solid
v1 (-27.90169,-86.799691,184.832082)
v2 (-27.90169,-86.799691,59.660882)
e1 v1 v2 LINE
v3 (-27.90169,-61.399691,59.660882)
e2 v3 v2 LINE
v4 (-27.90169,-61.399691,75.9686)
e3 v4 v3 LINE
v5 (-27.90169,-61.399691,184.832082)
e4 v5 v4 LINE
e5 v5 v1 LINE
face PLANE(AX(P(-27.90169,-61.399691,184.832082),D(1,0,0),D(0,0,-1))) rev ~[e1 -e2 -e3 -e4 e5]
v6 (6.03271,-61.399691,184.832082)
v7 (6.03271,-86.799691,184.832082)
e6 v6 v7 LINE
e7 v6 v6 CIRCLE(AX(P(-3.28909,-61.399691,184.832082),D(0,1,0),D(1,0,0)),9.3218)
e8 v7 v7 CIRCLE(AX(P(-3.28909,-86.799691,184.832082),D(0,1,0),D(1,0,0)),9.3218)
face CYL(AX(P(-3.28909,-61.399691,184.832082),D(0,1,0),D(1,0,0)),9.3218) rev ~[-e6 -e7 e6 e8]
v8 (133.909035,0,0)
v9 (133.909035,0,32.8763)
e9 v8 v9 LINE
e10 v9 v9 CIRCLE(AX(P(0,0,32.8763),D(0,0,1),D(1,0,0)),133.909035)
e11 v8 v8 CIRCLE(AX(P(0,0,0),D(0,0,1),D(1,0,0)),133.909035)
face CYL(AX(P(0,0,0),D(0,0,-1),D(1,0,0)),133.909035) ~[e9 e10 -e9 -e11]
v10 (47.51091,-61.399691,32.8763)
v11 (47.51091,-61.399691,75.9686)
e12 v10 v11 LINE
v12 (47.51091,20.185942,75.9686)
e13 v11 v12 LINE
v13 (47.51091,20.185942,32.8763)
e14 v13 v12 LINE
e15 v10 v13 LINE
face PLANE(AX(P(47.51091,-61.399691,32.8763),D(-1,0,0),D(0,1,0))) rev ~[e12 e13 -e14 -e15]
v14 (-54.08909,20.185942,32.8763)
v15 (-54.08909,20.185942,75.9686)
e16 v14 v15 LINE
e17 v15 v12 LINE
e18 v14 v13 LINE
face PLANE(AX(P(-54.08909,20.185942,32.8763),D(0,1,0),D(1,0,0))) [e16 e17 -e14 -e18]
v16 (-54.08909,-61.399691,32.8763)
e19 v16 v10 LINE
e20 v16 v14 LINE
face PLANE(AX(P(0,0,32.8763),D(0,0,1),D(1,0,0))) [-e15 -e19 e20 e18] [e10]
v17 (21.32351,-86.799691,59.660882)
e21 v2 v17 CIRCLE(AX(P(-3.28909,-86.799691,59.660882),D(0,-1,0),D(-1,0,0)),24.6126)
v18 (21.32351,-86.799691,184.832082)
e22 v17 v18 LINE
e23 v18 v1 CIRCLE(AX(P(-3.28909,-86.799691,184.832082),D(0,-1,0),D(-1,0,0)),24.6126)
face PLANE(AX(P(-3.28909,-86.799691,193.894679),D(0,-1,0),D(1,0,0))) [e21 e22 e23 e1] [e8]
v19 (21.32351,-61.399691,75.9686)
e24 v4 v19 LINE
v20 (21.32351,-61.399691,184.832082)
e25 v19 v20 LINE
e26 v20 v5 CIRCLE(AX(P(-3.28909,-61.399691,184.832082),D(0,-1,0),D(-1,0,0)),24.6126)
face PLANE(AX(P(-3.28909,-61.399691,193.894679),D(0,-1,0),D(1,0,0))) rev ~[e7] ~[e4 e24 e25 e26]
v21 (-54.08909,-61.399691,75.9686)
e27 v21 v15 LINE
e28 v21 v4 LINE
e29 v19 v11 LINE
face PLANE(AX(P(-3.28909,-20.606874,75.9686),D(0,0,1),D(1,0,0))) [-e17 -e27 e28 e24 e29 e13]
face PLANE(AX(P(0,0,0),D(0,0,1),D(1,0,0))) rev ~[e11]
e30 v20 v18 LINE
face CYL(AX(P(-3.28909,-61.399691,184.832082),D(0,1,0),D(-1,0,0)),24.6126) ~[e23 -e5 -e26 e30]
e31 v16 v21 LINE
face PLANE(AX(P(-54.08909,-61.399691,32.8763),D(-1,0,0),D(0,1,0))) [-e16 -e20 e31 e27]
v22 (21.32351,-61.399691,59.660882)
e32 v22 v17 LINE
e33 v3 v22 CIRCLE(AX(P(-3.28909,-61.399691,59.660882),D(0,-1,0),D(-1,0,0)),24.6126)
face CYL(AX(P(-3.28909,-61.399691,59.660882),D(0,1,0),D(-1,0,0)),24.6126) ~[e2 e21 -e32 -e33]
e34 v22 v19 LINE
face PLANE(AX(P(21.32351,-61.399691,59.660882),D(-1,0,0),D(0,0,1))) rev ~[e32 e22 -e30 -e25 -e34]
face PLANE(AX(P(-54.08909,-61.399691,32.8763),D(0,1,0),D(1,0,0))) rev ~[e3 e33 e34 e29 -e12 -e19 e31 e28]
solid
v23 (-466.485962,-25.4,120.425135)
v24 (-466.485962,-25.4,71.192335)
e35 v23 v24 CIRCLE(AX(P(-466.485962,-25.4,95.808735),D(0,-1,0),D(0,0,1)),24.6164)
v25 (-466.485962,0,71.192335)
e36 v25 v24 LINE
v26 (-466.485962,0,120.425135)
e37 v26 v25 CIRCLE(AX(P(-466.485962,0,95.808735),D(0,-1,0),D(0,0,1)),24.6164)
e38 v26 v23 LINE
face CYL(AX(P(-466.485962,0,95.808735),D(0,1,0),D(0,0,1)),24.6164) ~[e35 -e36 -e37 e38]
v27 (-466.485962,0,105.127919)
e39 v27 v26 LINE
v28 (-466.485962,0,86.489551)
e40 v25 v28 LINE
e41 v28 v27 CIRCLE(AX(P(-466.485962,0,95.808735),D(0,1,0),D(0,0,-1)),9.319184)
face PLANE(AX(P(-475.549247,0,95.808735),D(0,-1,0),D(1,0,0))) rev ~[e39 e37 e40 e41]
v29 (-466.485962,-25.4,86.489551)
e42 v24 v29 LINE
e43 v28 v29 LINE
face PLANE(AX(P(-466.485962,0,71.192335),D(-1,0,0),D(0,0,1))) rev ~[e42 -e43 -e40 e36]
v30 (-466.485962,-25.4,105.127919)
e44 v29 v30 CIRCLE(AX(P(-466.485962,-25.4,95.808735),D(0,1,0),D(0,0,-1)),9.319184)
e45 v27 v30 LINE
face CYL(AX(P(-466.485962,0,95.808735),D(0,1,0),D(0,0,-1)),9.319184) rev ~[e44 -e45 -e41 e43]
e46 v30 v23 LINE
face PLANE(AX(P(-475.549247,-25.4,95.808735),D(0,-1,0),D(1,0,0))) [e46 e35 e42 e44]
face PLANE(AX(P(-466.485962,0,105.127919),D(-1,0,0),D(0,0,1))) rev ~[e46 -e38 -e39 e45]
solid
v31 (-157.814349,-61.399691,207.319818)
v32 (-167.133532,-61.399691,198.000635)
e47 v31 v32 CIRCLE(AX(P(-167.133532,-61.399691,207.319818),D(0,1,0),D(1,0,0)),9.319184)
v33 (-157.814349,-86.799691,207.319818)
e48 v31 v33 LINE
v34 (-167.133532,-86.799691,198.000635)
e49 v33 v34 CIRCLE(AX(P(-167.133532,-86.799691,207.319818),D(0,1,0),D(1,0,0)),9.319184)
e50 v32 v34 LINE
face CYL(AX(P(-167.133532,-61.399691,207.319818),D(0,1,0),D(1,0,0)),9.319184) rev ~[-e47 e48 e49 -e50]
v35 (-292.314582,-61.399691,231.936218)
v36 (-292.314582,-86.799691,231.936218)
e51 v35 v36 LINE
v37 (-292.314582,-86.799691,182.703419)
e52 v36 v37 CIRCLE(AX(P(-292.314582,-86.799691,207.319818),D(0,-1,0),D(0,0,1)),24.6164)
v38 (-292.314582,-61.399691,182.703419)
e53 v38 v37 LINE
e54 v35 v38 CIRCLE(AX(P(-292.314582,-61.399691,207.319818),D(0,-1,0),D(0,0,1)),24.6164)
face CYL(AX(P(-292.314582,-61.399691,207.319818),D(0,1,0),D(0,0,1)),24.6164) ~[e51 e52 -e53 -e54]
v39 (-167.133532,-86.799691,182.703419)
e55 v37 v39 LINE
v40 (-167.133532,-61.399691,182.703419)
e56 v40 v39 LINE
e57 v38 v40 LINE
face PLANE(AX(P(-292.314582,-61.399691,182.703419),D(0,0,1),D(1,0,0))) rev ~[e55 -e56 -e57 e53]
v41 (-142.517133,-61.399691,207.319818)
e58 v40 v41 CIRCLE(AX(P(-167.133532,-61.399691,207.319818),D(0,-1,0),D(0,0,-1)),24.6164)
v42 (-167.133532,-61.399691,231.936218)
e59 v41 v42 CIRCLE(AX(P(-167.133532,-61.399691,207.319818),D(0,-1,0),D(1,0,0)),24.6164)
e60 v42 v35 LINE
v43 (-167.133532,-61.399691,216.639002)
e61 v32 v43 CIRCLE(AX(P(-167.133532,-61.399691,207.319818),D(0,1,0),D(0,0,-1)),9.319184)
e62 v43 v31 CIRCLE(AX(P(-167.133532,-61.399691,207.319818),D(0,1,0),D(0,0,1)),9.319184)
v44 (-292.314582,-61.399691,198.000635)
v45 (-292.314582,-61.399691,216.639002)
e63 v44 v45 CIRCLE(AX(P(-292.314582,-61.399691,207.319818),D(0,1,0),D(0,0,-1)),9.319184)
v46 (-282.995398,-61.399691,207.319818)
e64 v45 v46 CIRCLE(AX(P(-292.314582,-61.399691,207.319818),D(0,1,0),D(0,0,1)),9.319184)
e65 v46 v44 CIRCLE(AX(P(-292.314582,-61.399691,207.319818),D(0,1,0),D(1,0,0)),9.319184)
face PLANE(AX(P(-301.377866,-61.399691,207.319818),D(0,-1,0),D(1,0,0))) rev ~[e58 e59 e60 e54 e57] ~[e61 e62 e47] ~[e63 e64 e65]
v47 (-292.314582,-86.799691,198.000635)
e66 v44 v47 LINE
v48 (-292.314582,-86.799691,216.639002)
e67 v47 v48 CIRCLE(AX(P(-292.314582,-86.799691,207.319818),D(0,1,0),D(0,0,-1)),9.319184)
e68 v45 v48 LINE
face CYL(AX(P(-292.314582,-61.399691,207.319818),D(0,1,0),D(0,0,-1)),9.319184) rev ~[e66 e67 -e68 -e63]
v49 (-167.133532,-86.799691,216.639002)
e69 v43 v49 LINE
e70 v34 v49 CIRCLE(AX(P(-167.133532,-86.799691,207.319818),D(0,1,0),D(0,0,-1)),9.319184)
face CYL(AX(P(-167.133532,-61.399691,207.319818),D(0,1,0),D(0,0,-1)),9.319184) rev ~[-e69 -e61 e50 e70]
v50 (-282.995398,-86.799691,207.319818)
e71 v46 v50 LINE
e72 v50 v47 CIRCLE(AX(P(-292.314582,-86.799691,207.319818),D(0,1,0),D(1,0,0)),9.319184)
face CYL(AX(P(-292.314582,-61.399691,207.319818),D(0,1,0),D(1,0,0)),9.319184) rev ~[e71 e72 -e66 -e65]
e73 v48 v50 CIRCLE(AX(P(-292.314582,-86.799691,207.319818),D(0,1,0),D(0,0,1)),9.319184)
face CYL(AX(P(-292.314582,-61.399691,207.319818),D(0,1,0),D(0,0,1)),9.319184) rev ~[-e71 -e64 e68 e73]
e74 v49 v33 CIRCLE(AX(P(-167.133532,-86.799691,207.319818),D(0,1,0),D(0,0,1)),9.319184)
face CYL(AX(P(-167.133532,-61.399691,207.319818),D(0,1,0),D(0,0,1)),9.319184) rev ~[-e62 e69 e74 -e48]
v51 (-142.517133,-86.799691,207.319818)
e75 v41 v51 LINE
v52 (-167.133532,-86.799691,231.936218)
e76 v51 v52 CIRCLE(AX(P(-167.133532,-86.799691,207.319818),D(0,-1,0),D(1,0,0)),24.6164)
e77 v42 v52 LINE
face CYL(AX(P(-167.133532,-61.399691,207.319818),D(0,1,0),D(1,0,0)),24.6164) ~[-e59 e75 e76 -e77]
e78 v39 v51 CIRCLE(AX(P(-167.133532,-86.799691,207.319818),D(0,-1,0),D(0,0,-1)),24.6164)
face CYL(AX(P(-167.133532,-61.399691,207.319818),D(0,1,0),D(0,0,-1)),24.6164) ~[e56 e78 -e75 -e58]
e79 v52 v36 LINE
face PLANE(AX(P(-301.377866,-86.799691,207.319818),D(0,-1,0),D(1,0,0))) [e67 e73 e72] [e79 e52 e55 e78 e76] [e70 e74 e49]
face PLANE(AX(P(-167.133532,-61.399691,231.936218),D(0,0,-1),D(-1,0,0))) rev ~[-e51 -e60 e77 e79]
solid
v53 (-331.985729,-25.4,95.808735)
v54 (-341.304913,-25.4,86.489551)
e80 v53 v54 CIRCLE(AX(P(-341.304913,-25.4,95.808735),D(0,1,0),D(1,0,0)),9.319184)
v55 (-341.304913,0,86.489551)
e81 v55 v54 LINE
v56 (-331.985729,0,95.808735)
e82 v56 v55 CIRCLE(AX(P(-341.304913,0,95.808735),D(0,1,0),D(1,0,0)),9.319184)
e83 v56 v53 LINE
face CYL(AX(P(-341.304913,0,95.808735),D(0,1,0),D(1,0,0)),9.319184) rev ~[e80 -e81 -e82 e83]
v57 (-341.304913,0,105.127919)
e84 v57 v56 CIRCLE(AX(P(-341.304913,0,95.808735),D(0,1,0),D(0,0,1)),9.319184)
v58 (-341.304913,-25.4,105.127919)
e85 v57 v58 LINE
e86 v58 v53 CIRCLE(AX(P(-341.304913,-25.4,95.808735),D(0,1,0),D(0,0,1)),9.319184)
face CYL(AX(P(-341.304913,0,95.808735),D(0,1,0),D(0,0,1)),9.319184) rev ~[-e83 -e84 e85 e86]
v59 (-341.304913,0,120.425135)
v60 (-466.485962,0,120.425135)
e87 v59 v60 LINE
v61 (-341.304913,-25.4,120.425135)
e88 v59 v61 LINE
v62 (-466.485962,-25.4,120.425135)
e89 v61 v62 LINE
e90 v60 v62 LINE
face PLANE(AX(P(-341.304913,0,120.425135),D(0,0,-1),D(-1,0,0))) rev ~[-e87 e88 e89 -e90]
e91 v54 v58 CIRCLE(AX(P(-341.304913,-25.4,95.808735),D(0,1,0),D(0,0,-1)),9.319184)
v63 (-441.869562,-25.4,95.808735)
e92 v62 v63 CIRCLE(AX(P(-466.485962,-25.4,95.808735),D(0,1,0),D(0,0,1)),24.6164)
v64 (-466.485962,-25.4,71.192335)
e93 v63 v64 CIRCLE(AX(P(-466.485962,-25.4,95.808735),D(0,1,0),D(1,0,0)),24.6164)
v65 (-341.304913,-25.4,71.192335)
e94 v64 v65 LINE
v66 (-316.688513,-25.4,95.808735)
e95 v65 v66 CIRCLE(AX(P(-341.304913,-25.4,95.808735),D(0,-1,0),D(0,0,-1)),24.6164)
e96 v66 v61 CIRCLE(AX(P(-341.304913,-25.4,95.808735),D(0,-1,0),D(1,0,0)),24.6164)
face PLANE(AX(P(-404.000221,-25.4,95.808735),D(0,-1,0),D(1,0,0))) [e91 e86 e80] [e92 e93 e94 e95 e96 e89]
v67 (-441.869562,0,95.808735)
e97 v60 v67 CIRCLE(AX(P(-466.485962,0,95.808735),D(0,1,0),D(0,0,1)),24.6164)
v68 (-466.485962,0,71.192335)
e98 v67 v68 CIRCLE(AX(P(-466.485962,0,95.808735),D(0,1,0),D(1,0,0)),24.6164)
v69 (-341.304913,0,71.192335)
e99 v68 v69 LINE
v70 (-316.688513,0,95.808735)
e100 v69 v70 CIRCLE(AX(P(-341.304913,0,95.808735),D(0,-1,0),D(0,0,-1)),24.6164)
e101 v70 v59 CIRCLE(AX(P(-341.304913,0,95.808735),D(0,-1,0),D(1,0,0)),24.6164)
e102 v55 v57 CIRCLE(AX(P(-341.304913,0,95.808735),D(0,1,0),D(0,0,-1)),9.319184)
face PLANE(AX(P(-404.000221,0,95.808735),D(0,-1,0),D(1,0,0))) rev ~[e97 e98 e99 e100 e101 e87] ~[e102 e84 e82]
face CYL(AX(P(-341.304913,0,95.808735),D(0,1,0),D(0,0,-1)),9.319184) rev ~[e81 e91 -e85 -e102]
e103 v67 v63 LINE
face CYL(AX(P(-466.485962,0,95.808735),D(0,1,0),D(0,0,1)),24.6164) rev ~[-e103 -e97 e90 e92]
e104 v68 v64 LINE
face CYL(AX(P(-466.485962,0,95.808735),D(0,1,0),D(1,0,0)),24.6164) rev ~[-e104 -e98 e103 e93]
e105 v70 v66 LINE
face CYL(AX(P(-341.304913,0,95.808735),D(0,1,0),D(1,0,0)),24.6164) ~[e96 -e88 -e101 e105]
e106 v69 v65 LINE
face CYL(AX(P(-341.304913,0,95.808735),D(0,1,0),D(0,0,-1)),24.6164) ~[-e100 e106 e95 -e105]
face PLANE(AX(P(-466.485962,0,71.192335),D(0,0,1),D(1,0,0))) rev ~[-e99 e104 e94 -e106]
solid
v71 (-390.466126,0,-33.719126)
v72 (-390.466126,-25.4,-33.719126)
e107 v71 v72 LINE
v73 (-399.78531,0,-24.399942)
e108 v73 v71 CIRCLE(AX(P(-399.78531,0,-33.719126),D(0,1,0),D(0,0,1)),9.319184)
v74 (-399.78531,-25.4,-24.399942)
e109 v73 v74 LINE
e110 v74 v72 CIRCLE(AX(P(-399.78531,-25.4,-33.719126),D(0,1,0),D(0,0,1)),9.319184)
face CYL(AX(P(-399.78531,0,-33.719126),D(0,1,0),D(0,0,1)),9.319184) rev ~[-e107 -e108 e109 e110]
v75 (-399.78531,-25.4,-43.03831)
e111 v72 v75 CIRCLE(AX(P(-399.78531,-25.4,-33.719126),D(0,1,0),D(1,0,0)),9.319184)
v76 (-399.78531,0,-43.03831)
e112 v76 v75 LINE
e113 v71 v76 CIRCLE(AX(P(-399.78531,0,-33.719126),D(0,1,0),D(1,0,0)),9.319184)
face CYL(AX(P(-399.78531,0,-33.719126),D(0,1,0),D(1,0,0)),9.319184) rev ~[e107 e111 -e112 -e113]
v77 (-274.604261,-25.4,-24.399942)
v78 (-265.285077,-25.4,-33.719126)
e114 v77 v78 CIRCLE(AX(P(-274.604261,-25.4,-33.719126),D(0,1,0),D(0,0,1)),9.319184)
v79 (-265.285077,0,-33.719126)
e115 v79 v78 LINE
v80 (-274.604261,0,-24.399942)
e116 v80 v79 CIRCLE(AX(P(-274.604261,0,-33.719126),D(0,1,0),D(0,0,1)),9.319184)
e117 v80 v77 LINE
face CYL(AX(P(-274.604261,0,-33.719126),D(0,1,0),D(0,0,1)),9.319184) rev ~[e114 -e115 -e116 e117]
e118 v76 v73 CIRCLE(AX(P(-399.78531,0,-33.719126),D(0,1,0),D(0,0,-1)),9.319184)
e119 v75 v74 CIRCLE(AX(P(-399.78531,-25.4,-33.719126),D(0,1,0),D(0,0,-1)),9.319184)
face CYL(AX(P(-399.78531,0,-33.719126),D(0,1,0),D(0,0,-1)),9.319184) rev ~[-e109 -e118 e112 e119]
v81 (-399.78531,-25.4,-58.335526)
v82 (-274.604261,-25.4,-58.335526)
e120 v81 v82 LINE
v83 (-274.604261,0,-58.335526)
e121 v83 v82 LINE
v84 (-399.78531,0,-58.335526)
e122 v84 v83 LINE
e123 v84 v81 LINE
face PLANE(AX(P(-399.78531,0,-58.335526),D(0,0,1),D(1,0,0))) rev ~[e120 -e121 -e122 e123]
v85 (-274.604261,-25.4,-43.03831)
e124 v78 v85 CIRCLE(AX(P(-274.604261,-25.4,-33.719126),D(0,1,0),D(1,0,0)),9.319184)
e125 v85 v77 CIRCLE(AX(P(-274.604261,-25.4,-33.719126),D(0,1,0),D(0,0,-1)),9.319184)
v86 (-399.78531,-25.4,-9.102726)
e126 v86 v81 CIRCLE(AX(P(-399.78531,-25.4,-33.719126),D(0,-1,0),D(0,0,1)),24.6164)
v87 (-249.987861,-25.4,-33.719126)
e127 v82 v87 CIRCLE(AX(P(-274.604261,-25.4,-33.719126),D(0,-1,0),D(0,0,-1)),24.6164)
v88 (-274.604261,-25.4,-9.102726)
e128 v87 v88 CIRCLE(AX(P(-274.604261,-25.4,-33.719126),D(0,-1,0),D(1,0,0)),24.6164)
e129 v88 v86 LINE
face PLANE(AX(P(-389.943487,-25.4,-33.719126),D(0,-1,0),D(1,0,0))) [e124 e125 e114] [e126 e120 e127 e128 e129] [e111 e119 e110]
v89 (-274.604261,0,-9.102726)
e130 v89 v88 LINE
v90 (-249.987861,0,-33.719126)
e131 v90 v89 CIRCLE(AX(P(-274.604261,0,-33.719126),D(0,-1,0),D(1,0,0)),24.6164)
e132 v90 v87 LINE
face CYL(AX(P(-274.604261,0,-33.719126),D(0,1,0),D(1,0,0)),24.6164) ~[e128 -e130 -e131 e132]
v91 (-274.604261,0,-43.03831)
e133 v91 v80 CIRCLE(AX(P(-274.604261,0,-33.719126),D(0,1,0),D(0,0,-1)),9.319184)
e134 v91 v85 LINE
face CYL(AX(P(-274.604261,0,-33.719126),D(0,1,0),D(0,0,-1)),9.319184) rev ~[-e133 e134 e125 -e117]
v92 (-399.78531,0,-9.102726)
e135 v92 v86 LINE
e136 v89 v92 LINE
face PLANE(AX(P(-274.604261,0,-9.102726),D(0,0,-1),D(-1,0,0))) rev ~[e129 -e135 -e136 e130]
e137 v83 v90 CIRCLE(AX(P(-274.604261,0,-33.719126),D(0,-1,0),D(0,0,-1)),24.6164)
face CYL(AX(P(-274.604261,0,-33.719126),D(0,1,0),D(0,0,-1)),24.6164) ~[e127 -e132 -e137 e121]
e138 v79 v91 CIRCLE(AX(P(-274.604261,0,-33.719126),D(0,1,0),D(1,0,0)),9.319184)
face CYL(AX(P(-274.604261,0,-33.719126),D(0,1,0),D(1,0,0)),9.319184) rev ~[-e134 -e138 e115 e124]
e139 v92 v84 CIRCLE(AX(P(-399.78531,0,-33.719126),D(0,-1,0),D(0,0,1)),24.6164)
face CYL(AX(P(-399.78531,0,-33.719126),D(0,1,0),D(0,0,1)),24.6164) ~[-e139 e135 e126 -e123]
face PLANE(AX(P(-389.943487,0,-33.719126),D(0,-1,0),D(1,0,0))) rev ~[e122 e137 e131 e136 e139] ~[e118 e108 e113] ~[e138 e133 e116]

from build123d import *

# Parameters (mm, degrees)
F1_DEPTH = 25.4
F2_R     = 133.9090353396
F3_DEPTH = 32.8763
F4_W     = 101.6
F4_H     = 81.5856331369
F5_DEPTH = 43.0923
F7_DEPTH = 25.4


with BuildPart() as f1:
    # F0 (on Front) → F1 (new body)
    with BuildSketch(Plane.XZ):
        with BuildLine():
            ThreePointArc((-375.1689102501, -33.7191261351), (-382.3788868172, -16.3127029223), (-399.78531003, -9.1027263552))
            Line((-399.78531003, -9.1027263552), (-399.78531003, -24.3999422365))
            ThreePointArc((-399.78531003, -24.3999422365), (-393.1956519002, -27.1294680053), (-390.4661261314, -33.7191261351))
            ThreePointArc((-390.4661261314, -33.7191261351), (-393.1956519002, -40.3087842649), (-399.78531003, -43.0383100337))
            Line((-399.78531003, -43.0383100337), (-399.78531003, -58.335525915))
            ThreePointArc((-399.78531003, -58.335525915), (-382.3788868172, -51.1255493479), (-375.1689102501, -33.7191261351))
        make_face()
        with BuildLine():
            Line((-274.6042609215, -9.1027263552), (-399.78531003, -9.1027263552))
            ThreePointArc((-399.78531003, -9.1027263552), (-382.3788868172, -16.3127029223), (-375.1689102501, -33.7191261351))
            ThreePointArc((-375.1689102501, -33.7191261351), (-382.3788868172, -51.1255493479), (-399.78531003, -58.335525915))
            Line((-399.78531003, -58.335525915), (-274.6042609215, -58.335525915))
            ThreePointArc((-274.6042609215, -58.335525915), (-299.2206607014, -33.7191261351), (-274.6042609215, -9.1027263552))
        make_face()
        with BuildLine():
            Line((-399.78531003, -24.3999422365), (-399.78531003, -9.1027263552))
            ThreePointArc((-399.78531003, -9.1027263552), (-424.4017098099, -33.7191261351), (-399.78531003, -58.335525915))
            Line((-399.78531003, -58.335525915), (-399.78531003, -43.0383100337))
            ThreePointArc((-399.78531003, -43.0383100337), (-409.1044939286, -33.7191261351), (-399.78531003, -24.3999422365))
        make_face()
        with BuildLine():
            ThreePointArc((-249.9878611416, -33.7191261351), (-257.1978377087, -16.3127029223), (-274.6042609215, -9.1027263552))
            Line((-274.6042609215, -9.1027263552), (-274.6042609215, -24.3999422365))
            ThreePointArc((-274.6042609215, -24.3999422365), (-268.0146027917, -27.1294680053), (-265.2850770229, -33.7191261351))
            ThreePointArc((-265.2850770229, -33.7191261351), (-268.0146027917, -40.3087842649), (-274.6042609215, -43.0383100337))
            Line((-274.6042609215, -43.0383100337), (-274.6042609215, -58.335525915))
            ThreePointArc((-274.6042609215, -58.335525915), (-257.1978377087, -51.1255493479), (-249.9878611416, -33.7191261351))
        make_face()
        with BuildLine():
            Line((-274.6042609215, -24.3999422365), (-274.6042609215, -9.1027263552))
            ThreePointArc((-274.6042609215, -9.1027263552), (-299.2206607014, -33.7191261351), (-274.6042609215, -58.335525915))
            Line((-274.6042609215, -58.335525915), (-274.6042609215, -43.0383100337))
            ThreePointArc((-274.6042609215, -43.0383100337), (-283.9234448201, -33.7191261351), (-274.6042609215, -24.3999422365))
        make_face()
    extrude(amount=F1_DEPTH)


with BuildPart() as f1b:
    # F0 (on Front) → F1, piece 2 (new body)
    with BuildSketch(Plane.XZ):
        with BuildLine():
            Line((-341.3049131632, 120.4251348972), (-466.4859622717, 120.4251348972))
            ThreePointArc((-466.4859622717, 120.4251348972), (-449.0795390589, 113.2151583301), (-441.8695624918, 95.8087351173))
            ThreePointArc((-441.8695624918, 95.8087351173), (-449.0795390589, 78.4023119045), (-466.4859622717, 71.1923353374))
            Line((-466.4859622717, 71.1923353374), (-341.3049131632, 71.1923353374))
            ThreePointArc((-341.3049131632, 71.1923353374), (-365.9213129431, 95.8087351173), (-341.3049131632, 120.4251348972))
        make_face()
        with BuildLine():
            ThreePointArc((-316.6885133833, 95.8087351173), (-323.8984899504, 113.2151583301), (-341.3049131632, 120.4251348972))
            Line((-341.3049131632, 120.4251348972), (-341.3049131632, 105.1279190159))
            ThreePointArc((-341.3049131632, 105.1279190159), (-334.7152550334, 102.3983932471), (-331.9857292646, 95.8087351173))
            ThreePointArc((-331.9857292646, 95.8087351173), (-334.7152550334, 89.2190769875), (-341.3049131632, 86.4895512187))
            Line((-341.3049131632, 86.4895512187), (-341.3049131632, 71.1923353374))
            ThreePointArc((-341.3049131632, 71.1923353374), (-323.8984899504, 78.4023119045), (-316.6885133833, 95.8087351173))
        make_face()
        with BuildLine():
            Line((-341.3049131632, 105.1279190159), (-341.3049131632, 120.4251348972))
            ThreePointArc((-341.3049131632, 120.4251348972), (-365.9213129431, 95.8087351173), (-341.3049131632, 71.1923353374))
            Line((-341.3049131632, 71.1923353374), (-341.3049131632, 86.4895512187))
            ThreePointArc((-341.3049131632, 86.4895512187), (-350.6240970618, 95.8087351173), (-341.3049131632, 105.1279190159))
        make_face()
    extrude(amount=F1_DEPTH)


with BuildPart() as f1c:
    # F0 (on Front) → F1, piece 3 (new body)
    with BuildSketch(Plane.XZ):
        with BuildLine():
            Line((-466.4859622717, 105.1279190159), (-466.4859622717, 120.4251348972))
            ThreePointArc((-466.4859622717, 120.4251348972), (-491.1023620516, 95.8087351173), (-466.4859622717, 71.1923353374))
            Line((-466.4859622717, 71.1923353374), (-466.4859622717, 86.4895512187))
            ThreePointArc((-466.4859622717, 86.4895512187), (-475.8051461703, 95.8087351173), (-466.4859622717, 105.1279190159))
        make_face()
    extrude(amount=F1_DEPTH)


with BuildPart() as f3:
    # F2 (on Top) → F3 (new body)
    with BuildSketch(Plane.XY):
        Circle(F2_R)
    extrude(amount=F3_DEPTH)

    # F4 (on face) → F5 (join)
    with BuildSketch(Plane.XY.offset(32.8763)):
        with Locations((-3.2890904695, -20.6068744883)):
            Rectangle(F4_W, F4_H)
    extrude(amount=F5_DEPTH)

    # F6 (on face) → F7, piece 2 (join)
    with BuildSketch(Plane.XZ.offset(61.3996910568)):
        with BuildLine():
            Line((6.0327095305, 184.8320817577), (21.3235095305, 184.8320817577))
            ThreePointArc((21.3235095305, 184.8320817577), (-3.2890904695, 209.4446817577), (-27.9016904695, 184.8320817577))
            Line((-27.9016904695, 184.8320817577), (-12.6108904695, 184.8320817577))
            ThreePointArc((-12.6108904695, 184.8320817577), (-3.2890904695, 194.1538817577), (6.0327095305, 184.8320817577))
        make_face()
        with BuildLine():
            ThreePointArc((-27.9016904695, 184.8320817577), (-3.2890904695, 160.2194817577), (21.3235095305, 184.8320817577))
            Line((21.3235095305, 184.8320817577), (6.0327095305, 184.8320817577))
            ThreePointArc((6.0327095305, 184.8320817577), (-3.2890904695, 175.5102817577), (-12.6108904695, 184.8320817577))
            Line((-12.6108904695, 184.8320817577), (-27.9016904695, 184.8320817577))
        make_face()
        with BuildLine():
            Line((-21.7237969898, 75.9686), (15.1456160509, 75.9686))
            ThreePointArc((15.1456160509, 75.9686), (-3.2890904695, 84.2734817577), (-21.7237969898, 75.9686))
        make_face()
        with BuildLine():
            Line((-27.9016904695, 75.9686), (-27.9016904695, 59.6608817577))
            ThreePointArc((-27.9016904695, 59.6608817577), (-26.3054556958, 68.3802286673), (-21.7237969898, 75.9686))
            Line((-21.7237969898, 75.9686), (-27.9016904695, 75.9686))
        make_face()
        with BuildLine():
            ThreePointArc((15.1456160509, 75.9686), (19.7272747568, 68.3802286673), (21.3235095305, 59.6608817577))
            Line((21.3235095305, 59.6608817577), (21.3235095305, 75.9686))
            Line((21.3235095305, 75.9686), (15.1456160509, 75.9686))
        make_face()
        with BuildLine():
            ThreePointArc((-12.6108904695, 59.6608817577), (-3.2890904695, 68.9826817577), (6.0327095305, 59.6608817577))
            Line((6.0327095305, 59.6608817577), (21.3235095305, 59.6608817577))
            ThreePointArc((21.3235095305, 59.6608817577), (19.7272747568, 68.3802286673), (15.1456160509, 75.9686))
            Line((15.1456160509, 75.9686), (-21.7237969898, 75.9686))
            ThreePointArc((-21.7237969898, 75.9686), (-26.3054556958, 68.3802286673), (-27.9016904695, 59.6608817577))
            Line((-27.9016904695, 59.6608817577), (-12.6108904695, 59.6608817577))
        make_face()
        with BuildLine():
            Line((15.1456160509, 75.9686), (21.3235095305, 75.9686))
            Line((21.3235095305, 75.9686), (21.3235095305, 184.8320817577))
            ThreePointArc((21.3235095305, 184.8320817577), (-3.2890904695, 160.2194817577), (-27.9016904695, 184.8320817577))
            Line((-27.9016904695, 184.8320817577), (-27.9016904695, 75.9686))
            Line((-27.9016904695, 75.9686), (-21.7237969898, 75.9686))
            ThreePointArc((-21.7237969898, 75.9686), (-3.2890904695, 84.2734817577), (15.1456160509, 75.9686))
        make_face()
        with BuildLine():
            Line((21.3235095305, 59.6608817577), (6.0327095305, 59.6608817577))
            ThreePointArc((6.0327095305, 59.6608817577), (-3.2890904695, 50.3390817577), (-12.6108904695, 59.6608817577))
            Line((-12.6108904695, 59.6608817577), (-27.9016904695, 59.6608817577))
            ThreePointArc((-27.9016904695, 59.6608817577), (-3.2890904695, 35.0482817577), (21.3235095305, 59.6608817577))
        make_face()
        with BuildLine():
            Line((-12.6108904695, 59.6608817577), (6.0327095305, 59.6608817577))
            ThreePointArc((6.0327095305, 59.6608817577), (-3.2890904695, 68.9826817577), (-12.6108904695, 59.6608817577))
        make_face()
        with BuildLine():
            ThreePointArc((-12.6108904695, 59.6608817577), (-3.2890904695, 50.3390817577), (6.0327095305, 59.6608817577))
            Line((6.0327095305, 59.6608817577), (-12.6108904695, 59.6608817577))
        make_face()
    extrude(amount=F7_DEPTH)


with BuildPart() as f7:
    # F6 (on face) → F7 (new body)
    with BuildSketch(Plane.XZ.offset(61.3996910568)):
        with BuildLine():
            ThreePointArc((-292.314581573, 198.0006345385), (-301.6337654716, 207.3198184371), (-292.314581573, 216.6390023357))
            Line((-292.314581573, 216.6390023357), (-292.314581573, 231.936218217))
            ThreePointArc((-292.314581573, 231.936218217), (-316.9309813529, 207.3198184371), (-292.314581573, 182.7034186572))
            Line((-292.314581573, 182.7034186572), (-292.314581573, 198.0006345385))
        make_face()
        with BuildLine():
            Line((-167.1335324645, 231.936218217), (-292.314581573, 231.936218217))
            ThreePointArc((-292.314581573, 231.936218217), (-274.9081583602, 224.7262416499), (-267.6981817931, 207.3198184371))
            ThreePointArc((-267.6981817931, 207.3198184371), (-274.9081583602, 189.9133952243), (-292.314581573, 182.7034186572))
            Line((-292.314581573, 182.7034186572), (-167.1335324645, 182.7034186572))
            ThreePointArc((-167.1335324645, 182.7034186572), (-191.7499322444, 207.3198184371), (-167.1335324645, 231.936218217))
        make_face()
        with BuildLine():
            ThreePointArc((-142.5171326846, 207.3198184371), (-149.7271092517, 224.7262416499), (-167.1335324645, 231.936218217))
            Line((-167.1335324645, 231.936218217), (-167.1335324645, 216.6390023357))
            ThreePointArc((-167.1335324645, 216.6390023357), (-160.5438743347, 213.9094765669), (-157.8143485659, 207.3198184371))
            ThreePointArc((-157.8143485659, 207.3198184371), (-160.5438743347, 200.7301603073), (-167.1335324645, 198.0006345385))
            Line((-167.1335324645, 198.0006345385), (-167.1335324645, 182.7034186572))
            ThreePointArc((-167.1335324645, 182.7034186572), (-149.7271092517, 189.9133952243), (-142.5171326846, 207.3198184371))
        make_face()
        with BuildLine():
            ThreePointArc((-292.314581573, 216.6390023357), (-285.7249234432, 213.9094765669), (-282.9953976744, 207.3198184371))
            ThreePointArc((-282.9953976744, 207.3198184371), (-285.7249234432, 200.7301603073), (-292.314581573, 198.0006345385))
            Line((-292.314581573, 198.0006345385), (-292.314581573, 182.7034186572))
            ThreePointArc((-292.314581573, 182.7034186572), (-274.9081583602, 189.9133952243), (-267.6981817931, 207.3198184371))
            ThreePointArc((-267.6981817931, 207.3198184371), (-274.9081583602, 224.7262416499), (-292.314581573, 231.936218217))
            Line((-292.314581573, 231.936218217), (-292.314581573, 216.6390023357))
        make_face()
        with BuildLine():
            Line((-167.1335324645, 216.6390023357), (-167.1335324645, 231.936218217))
            ThreePointArc((-167.1335324645, 231.936218217), (-191.7499322444, 207.3198184371), (-167.1335324645, 182.7034186572))
            Line((-167.1335324645, 182.7034186572), (-167.1335324645, 198.0006345385))
            ThreePointArc((-167.1335324645, 198.0006345385), (-176.4527163631, 207.3198184371), (-167.1335324645, 216.6390023357))
        make_face()
    extrude(amount=F7_DEPTH)


solid = Compound([f1.part, f1b.part, f1c.part, f3.part, f7.part])
